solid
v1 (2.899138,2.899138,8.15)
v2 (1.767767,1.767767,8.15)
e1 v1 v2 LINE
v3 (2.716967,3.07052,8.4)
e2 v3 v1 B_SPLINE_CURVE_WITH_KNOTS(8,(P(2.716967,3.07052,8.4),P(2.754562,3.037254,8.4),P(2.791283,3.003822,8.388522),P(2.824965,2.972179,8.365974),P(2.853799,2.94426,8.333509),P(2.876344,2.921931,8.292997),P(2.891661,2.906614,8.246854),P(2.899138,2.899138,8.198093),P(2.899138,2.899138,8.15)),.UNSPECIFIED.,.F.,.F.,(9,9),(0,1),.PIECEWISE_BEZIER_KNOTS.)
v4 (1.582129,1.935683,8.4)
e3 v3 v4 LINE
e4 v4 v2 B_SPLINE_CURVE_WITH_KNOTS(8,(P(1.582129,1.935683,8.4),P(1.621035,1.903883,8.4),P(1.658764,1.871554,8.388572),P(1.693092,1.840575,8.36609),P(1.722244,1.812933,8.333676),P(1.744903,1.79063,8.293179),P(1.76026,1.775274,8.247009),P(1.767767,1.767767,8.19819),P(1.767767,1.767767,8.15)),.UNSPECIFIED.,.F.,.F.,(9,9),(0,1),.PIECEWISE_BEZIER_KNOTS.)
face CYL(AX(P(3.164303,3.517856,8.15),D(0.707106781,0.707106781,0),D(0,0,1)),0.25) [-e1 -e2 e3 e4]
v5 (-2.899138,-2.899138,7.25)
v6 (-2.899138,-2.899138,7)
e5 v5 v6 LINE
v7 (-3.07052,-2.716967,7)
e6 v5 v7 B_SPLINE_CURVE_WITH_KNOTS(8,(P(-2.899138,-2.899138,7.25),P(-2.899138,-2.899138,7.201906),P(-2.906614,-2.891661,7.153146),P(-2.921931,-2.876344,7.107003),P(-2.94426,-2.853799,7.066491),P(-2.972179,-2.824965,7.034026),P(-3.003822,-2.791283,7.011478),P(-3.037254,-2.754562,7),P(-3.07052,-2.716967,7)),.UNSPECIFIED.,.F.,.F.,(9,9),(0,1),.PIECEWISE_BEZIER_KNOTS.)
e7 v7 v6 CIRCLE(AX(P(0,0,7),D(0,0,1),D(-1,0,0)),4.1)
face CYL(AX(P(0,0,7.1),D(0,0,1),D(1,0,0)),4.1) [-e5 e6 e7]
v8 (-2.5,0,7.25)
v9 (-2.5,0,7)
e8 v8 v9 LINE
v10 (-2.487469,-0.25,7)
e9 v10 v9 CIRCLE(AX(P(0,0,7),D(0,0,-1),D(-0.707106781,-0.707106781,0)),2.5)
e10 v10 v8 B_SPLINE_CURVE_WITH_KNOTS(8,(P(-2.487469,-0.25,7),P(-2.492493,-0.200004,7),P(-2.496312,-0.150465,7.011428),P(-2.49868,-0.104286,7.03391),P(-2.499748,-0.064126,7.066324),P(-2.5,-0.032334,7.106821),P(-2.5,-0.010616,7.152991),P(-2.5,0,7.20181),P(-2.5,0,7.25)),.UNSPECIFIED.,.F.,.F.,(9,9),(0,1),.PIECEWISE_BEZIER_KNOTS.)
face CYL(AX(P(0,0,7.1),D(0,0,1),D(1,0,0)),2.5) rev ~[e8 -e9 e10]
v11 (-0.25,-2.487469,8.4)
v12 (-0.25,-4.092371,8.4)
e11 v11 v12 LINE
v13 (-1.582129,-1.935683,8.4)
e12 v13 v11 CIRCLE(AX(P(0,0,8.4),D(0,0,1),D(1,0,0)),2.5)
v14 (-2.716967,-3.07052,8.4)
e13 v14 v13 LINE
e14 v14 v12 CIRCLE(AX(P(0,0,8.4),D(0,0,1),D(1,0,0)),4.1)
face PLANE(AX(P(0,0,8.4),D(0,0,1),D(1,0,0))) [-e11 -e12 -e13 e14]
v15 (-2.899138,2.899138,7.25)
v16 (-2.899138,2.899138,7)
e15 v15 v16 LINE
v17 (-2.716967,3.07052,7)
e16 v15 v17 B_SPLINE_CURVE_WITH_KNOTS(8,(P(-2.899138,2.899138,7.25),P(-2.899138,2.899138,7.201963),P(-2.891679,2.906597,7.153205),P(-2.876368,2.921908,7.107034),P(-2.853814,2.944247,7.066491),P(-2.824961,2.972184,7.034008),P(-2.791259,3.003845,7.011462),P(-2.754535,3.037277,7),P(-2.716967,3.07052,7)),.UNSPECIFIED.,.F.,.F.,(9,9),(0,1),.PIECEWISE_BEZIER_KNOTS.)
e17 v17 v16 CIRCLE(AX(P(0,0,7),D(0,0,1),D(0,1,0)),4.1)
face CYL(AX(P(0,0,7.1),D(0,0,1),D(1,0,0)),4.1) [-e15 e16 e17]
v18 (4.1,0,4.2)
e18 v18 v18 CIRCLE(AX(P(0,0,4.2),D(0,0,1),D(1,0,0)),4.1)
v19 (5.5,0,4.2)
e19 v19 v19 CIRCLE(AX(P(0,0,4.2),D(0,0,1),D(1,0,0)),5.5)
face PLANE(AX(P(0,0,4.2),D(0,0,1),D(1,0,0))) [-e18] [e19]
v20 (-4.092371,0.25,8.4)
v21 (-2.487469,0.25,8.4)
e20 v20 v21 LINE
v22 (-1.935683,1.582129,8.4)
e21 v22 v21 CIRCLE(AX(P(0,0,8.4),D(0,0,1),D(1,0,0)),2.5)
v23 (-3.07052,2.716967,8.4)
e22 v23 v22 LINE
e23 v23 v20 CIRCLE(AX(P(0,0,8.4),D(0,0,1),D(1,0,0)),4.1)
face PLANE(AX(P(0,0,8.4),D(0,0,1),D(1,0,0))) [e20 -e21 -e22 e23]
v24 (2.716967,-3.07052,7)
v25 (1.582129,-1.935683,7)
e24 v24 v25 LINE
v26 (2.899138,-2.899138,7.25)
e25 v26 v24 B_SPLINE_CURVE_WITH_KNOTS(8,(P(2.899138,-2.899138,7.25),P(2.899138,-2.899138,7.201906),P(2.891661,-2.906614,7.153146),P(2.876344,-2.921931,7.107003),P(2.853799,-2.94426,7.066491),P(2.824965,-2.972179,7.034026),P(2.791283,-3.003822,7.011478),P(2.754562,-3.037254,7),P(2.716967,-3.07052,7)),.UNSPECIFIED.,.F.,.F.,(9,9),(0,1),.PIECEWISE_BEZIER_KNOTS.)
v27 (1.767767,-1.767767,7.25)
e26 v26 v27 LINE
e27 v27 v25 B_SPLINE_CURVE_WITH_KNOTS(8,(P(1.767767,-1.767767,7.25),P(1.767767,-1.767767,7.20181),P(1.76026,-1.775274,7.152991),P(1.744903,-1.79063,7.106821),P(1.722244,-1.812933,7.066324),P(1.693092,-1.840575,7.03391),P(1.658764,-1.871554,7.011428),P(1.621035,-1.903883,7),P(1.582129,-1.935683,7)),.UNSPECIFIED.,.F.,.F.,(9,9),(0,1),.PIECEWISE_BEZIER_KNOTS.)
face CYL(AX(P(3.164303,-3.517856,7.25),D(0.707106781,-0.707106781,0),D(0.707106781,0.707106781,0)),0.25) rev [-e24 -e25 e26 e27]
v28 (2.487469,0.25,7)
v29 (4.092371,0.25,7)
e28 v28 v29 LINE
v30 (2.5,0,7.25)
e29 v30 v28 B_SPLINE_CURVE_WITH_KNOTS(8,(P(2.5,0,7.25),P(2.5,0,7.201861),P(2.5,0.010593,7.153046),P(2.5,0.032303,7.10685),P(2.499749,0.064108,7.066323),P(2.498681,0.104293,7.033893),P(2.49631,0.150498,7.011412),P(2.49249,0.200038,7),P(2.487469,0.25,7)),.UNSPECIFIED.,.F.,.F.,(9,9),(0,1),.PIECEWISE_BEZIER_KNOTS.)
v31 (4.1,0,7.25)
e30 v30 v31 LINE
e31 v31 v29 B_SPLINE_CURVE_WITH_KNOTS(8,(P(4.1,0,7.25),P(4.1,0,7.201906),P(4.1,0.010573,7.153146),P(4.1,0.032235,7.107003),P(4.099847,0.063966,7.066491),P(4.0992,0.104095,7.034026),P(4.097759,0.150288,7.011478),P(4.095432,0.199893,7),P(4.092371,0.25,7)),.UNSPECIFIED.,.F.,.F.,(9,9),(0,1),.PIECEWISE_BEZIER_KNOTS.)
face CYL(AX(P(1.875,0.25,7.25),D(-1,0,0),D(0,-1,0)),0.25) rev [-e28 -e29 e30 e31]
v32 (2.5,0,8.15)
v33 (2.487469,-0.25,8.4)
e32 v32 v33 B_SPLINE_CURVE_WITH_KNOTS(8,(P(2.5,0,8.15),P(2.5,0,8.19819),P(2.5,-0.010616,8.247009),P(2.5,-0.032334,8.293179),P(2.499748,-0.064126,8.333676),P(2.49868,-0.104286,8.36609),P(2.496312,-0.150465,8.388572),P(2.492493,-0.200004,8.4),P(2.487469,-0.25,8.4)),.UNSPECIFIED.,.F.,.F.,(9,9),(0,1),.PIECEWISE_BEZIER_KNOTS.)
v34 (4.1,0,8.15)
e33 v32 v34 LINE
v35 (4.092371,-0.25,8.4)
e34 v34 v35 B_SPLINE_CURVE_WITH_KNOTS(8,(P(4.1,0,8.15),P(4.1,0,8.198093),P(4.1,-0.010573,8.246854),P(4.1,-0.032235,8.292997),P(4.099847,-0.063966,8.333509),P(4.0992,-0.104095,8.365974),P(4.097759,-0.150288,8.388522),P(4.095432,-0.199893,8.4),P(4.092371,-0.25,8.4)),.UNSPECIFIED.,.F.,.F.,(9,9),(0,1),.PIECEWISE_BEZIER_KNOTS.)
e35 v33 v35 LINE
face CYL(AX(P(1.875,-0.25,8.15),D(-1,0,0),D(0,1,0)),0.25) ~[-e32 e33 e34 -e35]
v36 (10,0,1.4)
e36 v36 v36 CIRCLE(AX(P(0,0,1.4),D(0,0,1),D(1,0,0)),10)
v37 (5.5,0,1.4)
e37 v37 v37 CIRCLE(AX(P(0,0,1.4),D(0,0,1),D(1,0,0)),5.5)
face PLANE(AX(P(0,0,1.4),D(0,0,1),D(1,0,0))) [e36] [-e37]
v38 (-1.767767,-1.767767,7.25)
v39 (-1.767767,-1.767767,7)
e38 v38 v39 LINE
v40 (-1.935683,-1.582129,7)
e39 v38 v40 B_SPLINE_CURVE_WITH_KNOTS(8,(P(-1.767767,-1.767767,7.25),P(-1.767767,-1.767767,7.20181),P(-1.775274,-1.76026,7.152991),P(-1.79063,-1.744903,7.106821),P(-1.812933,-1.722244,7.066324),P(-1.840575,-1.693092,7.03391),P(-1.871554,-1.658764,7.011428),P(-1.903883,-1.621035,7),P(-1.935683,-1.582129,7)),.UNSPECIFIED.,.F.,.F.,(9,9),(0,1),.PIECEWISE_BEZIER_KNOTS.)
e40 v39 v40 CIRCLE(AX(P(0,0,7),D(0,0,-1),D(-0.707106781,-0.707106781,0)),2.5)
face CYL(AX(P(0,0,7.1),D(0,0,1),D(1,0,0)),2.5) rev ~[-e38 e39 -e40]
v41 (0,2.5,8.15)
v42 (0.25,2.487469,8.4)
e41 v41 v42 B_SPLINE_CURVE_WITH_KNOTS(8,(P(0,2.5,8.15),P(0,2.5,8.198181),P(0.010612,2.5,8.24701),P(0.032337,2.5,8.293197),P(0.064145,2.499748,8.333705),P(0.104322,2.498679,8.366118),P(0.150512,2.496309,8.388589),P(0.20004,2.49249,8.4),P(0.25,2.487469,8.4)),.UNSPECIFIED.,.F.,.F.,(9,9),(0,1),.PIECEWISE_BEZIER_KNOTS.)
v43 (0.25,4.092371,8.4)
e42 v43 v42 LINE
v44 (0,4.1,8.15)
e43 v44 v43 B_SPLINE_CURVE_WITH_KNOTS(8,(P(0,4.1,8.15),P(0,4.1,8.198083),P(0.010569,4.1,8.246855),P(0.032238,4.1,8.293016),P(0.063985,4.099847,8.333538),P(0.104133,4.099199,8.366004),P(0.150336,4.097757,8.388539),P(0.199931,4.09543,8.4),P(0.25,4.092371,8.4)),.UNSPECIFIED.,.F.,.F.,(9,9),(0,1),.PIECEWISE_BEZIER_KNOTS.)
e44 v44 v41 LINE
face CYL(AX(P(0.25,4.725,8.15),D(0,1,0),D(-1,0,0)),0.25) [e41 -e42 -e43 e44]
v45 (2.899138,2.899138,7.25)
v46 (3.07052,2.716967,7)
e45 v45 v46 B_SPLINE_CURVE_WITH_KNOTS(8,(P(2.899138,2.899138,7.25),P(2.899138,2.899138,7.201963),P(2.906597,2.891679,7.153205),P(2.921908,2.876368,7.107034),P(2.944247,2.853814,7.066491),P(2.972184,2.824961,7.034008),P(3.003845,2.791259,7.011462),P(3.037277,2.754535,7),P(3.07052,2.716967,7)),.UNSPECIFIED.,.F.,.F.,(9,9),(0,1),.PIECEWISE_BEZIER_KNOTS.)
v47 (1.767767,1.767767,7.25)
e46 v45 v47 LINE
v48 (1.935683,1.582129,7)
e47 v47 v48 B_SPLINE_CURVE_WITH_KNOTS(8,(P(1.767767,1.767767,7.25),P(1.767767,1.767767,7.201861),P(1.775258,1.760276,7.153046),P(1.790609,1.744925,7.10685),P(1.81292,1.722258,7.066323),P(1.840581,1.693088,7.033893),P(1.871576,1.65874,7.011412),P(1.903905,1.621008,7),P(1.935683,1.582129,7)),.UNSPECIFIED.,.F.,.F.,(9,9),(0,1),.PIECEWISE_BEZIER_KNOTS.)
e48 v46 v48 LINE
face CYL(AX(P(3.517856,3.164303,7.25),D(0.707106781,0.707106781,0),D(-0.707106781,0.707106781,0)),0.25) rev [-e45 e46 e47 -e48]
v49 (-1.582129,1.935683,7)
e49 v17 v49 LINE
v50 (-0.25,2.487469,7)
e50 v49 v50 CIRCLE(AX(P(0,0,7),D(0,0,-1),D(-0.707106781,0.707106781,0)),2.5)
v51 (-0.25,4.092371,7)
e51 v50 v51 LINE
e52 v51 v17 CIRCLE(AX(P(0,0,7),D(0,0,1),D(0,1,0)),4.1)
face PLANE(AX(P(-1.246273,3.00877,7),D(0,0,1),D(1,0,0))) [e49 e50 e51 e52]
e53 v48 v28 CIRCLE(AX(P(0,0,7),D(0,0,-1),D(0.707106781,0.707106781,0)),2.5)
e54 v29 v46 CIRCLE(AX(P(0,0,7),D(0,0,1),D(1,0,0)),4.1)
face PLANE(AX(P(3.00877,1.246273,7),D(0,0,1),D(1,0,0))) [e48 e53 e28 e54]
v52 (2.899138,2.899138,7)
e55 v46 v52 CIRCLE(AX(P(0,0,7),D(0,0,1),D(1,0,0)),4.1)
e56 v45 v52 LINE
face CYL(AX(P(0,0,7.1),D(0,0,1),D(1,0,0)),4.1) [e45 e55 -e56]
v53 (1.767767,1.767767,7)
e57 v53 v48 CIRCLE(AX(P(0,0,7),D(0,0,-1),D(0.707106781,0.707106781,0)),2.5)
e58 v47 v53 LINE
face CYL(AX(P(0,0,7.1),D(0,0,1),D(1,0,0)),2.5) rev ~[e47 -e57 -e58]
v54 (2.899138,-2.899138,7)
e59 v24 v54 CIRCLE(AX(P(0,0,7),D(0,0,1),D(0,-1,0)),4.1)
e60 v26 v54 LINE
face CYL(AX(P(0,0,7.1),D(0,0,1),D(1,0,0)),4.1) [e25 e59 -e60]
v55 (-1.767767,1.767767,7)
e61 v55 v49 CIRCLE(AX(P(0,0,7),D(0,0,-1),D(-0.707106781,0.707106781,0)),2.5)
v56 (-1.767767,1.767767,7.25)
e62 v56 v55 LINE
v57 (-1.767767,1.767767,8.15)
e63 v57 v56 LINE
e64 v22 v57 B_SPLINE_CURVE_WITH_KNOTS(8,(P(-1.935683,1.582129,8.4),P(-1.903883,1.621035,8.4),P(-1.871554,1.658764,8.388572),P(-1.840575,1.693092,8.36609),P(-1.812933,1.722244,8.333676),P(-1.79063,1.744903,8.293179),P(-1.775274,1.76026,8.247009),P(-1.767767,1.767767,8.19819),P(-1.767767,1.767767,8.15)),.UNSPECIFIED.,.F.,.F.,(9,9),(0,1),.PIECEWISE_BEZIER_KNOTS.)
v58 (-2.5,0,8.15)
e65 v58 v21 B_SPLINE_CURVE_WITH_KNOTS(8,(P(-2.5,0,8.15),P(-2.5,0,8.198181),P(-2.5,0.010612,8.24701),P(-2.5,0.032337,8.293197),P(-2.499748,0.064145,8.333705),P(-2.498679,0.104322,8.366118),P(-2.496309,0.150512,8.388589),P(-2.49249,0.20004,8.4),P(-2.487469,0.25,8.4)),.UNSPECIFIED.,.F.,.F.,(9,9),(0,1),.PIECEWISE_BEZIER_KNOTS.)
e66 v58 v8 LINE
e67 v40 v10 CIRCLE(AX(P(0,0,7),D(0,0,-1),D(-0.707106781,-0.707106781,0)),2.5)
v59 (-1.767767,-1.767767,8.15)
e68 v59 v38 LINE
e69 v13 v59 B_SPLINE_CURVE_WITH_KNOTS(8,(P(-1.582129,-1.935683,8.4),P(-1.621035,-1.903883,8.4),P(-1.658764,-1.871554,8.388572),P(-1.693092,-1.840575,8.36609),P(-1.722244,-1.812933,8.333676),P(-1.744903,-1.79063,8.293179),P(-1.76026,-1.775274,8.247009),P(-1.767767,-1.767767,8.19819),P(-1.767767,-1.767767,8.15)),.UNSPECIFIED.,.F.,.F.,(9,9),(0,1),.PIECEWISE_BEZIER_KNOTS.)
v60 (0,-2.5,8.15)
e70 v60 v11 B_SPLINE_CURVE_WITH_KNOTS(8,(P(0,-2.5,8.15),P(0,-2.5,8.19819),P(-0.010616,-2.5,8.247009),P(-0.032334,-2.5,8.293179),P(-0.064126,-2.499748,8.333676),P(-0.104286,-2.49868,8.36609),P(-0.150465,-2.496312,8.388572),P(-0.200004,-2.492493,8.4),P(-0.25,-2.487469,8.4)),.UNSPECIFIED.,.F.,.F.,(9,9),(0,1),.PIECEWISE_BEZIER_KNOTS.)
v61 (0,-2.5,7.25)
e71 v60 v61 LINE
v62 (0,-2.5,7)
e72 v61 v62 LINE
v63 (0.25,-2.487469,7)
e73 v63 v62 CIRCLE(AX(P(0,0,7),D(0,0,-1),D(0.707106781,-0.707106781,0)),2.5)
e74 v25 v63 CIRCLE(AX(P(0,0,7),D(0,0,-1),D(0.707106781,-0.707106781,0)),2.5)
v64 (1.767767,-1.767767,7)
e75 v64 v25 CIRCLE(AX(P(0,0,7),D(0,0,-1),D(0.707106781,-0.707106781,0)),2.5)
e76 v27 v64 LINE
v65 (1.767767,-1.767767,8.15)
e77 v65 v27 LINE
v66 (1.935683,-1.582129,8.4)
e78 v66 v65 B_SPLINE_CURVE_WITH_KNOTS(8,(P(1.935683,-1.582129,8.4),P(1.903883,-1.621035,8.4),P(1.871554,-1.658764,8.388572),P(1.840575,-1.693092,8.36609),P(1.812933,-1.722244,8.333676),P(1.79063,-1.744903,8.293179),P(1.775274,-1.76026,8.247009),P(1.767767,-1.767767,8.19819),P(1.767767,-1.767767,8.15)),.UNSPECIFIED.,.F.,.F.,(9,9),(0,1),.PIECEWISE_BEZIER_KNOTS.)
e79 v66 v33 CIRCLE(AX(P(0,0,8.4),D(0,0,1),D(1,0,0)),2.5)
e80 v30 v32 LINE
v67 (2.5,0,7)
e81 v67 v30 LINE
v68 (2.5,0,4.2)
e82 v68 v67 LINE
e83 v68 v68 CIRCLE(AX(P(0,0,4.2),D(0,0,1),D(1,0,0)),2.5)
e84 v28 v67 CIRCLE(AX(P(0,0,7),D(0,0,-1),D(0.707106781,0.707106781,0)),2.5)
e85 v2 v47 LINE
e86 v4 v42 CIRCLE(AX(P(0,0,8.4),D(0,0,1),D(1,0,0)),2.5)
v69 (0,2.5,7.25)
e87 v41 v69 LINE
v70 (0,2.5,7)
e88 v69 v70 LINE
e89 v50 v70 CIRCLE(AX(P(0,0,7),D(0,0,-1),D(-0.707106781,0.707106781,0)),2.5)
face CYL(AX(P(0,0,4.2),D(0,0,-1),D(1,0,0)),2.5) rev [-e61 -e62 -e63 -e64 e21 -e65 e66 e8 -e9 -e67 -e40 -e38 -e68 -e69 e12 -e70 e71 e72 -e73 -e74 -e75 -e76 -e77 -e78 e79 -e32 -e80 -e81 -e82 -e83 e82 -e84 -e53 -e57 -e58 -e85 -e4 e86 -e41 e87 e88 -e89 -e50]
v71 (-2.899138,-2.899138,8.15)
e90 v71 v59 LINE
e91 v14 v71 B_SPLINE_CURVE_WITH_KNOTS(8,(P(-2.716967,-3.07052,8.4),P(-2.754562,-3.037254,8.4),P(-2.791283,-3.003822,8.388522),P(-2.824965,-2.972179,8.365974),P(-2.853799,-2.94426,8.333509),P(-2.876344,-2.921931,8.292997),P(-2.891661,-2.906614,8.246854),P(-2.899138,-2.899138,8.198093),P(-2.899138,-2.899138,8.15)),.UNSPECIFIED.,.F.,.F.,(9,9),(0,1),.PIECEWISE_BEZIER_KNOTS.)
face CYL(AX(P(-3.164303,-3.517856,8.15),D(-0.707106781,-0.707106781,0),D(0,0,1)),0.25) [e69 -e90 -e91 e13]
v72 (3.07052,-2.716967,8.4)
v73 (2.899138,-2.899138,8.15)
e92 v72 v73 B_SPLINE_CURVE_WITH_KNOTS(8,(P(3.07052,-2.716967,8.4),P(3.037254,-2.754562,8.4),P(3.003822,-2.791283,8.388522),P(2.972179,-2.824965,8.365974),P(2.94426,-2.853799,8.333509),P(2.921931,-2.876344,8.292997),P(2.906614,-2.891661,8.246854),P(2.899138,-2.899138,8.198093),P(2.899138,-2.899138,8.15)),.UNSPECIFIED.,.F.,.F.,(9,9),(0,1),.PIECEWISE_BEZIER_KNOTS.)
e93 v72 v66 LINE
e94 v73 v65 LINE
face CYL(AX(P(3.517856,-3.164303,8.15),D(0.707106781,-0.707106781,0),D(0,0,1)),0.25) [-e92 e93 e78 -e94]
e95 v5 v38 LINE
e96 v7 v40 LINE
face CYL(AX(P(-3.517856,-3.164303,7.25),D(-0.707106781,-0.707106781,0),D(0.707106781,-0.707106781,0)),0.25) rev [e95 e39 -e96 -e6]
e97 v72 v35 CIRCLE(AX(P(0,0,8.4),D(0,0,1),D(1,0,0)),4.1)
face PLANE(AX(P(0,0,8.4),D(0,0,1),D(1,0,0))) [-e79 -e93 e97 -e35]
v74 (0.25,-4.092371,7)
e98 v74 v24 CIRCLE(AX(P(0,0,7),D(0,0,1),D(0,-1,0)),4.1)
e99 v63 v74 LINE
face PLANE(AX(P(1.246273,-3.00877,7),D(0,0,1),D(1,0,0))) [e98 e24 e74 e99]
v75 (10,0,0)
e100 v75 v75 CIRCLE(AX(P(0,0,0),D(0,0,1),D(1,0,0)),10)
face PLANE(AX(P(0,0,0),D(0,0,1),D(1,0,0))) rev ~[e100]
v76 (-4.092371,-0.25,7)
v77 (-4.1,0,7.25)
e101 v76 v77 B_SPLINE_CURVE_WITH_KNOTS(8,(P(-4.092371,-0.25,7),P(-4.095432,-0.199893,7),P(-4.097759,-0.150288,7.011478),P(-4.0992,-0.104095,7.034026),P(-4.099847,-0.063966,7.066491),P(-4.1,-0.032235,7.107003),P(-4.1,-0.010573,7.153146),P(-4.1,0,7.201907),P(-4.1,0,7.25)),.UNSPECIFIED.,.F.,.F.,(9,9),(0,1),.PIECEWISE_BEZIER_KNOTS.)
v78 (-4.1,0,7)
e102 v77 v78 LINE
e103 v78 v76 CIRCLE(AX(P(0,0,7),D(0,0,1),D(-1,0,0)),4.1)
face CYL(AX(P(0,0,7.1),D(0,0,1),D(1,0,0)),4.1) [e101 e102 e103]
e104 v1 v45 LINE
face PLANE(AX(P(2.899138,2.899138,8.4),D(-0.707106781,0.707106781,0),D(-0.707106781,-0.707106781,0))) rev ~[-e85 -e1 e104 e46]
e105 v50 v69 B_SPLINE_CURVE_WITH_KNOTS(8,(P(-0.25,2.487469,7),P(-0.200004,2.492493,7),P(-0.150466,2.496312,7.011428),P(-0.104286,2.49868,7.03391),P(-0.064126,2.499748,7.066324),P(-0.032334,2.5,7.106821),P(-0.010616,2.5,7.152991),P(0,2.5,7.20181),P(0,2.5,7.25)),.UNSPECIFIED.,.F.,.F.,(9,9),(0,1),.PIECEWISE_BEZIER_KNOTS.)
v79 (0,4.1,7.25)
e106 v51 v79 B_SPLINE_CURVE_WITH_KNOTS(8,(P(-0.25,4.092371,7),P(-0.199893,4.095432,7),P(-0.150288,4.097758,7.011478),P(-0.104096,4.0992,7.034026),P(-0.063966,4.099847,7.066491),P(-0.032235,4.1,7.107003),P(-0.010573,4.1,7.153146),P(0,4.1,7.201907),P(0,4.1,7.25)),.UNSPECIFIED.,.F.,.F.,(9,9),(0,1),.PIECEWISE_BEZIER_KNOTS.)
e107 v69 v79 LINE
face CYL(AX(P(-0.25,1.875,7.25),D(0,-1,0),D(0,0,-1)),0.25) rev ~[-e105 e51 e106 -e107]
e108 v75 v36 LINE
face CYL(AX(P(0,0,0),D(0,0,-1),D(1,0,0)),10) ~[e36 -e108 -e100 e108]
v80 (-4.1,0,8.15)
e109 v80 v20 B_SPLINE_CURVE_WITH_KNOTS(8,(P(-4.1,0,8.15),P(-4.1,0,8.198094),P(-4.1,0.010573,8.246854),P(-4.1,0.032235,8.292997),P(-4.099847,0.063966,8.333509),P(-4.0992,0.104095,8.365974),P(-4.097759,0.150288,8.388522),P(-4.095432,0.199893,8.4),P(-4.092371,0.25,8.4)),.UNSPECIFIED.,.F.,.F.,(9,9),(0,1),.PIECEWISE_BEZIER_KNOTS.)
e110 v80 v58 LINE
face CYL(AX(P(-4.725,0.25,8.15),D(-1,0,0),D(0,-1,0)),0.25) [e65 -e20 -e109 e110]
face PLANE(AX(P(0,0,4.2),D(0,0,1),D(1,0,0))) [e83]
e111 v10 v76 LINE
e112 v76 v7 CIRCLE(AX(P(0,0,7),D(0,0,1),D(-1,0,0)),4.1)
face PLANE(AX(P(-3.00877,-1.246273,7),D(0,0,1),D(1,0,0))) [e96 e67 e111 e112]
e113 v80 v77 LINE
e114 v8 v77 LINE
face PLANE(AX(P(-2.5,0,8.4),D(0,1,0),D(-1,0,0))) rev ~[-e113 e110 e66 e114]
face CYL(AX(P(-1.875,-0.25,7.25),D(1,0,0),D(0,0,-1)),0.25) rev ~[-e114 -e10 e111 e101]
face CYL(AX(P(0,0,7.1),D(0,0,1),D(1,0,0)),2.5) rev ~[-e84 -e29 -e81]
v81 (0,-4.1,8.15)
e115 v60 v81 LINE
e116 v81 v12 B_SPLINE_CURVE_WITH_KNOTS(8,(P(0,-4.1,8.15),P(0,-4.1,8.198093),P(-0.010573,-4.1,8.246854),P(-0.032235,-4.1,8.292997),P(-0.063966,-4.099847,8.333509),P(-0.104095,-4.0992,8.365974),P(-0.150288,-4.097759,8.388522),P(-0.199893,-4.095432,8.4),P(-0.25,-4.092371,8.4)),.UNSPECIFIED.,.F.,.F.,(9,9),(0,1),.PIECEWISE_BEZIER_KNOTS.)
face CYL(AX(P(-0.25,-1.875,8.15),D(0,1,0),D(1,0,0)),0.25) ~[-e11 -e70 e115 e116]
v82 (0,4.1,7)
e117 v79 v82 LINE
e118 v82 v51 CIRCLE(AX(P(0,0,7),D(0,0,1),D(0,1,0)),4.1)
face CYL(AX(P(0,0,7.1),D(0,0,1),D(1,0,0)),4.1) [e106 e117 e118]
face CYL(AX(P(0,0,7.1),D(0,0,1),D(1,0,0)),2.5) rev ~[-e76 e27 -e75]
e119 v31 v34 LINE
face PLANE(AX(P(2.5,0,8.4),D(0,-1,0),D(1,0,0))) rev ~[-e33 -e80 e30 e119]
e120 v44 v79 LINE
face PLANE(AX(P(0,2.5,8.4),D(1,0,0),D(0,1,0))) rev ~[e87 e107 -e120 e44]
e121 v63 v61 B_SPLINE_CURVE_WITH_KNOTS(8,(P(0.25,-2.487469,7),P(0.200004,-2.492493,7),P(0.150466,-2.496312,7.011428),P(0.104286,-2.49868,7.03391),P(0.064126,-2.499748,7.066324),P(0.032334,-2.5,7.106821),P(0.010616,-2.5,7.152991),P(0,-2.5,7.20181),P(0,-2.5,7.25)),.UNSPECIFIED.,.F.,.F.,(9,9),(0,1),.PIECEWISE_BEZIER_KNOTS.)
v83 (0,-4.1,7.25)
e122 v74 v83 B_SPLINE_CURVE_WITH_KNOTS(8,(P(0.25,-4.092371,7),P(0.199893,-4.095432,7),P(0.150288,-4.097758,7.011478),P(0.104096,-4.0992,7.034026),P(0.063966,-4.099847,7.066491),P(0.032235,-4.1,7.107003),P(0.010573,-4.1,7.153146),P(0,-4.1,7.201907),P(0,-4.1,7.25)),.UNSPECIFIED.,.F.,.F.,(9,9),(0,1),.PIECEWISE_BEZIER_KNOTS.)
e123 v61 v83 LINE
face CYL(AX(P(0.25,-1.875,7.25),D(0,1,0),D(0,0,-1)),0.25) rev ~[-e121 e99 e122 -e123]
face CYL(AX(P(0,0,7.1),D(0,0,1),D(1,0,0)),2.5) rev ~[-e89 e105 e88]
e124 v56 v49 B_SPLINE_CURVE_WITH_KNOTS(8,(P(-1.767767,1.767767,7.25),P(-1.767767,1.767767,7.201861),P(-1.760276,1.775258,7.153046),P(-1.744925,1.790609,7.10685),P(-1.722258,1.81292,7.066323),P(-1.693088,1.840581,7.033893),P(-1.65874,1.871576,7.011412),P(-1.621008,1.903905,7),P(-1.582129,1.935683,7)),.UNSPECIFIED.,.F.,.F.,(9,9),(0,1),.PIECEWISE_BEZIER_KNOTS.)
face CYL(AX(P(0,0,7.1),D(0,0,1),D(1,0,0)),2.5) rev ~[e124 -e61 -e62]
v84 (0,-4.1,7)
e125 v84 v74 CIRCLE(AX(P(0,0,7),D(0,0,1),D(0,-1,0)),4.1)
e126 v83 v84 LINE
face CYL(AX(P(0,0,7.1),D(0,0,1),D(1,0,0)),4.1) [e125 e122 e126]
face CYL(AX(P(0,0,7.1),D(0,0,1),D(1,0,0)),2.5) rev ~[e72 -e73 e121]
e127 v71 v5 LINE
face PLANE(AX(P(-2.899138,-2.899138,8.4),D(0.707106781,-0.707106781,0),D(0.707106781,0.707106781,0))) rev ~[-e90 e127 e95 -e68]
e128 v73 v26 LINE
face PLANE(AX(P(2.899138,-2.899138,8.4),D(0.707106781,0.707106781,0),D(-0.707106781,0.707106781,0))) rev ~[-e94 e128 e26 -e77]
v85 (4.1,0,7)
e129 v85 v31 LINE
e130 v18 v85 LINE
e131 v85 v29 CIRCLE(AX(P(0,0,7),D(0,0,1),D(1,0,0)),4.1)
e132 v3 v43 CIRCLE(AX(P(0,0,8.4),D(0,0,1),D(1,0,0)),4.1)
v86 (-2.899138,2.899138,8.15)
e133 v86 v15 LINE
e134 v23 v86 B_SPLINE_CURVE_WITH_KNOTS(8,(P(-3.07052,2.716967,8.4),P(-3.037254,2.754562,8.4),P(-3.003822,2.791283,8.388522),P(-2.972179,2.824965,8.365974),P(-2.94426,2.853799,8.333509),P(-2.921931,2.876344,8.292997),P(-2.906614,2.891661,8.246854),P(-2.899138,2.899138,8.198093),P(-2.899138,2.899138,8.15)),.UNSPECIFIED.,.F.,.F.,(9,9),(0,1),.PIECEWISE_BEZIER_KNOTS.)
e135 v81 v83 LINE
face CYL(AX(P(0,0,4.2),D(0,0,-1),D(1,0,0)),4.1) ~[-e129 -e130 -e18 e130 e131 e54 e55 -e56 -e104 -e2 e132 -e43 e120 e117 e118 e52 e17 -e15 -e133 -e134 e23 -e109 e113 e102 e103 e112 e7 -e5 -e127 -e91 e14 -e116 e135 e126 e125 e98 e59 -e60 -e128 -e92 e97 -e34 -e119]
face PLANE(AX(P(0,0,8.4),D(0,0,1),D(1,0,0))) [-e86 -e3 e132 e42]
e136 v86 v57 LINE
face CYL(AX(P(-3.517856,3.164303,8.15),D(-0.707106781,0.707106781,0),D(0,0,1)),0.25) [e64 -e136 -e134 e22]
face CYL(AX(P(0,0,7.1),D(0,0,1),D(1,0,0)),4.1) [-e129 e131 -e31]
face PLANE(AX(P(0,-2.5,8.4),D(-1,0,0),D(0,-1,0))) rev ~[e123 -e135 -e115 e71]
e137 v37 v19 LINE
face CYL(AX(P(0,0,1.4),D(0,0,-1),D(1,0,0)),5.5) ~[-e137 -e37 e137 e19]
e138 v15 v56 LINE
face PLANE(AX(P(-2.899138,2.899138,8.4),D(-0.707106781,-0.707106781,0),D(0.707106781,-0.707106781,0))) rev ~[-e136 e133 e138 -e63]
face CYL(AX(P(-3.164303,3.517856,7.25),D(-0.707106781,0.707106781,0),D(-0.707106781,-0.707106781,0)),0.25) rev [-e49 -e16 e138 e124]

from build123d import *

# Parameters (mm, degrees)
F0_R         = 10
F1_DEPTH     = 1.4
F2_R         = 5.5
F3_DEPTH     = 2.8
F4_R         = 4.1
F4_R_2       = 2.5
F5_DEPTH     = 4.2
F7_DEPTH     = 1.4
F8_T4_DEPTH  = 2.85
F8_S5_R      = 4.1
F8_T6_DEPTH  = 3
F8_S7_R      = 2.5
F8_T8_DEPTH  = 3
F8_T12_DEPTH = 2.85
F8_S13_R     = 4.1
F8_T14_DEPTH = 3
F8_S15_R     = 2.5
F8_T16_DEPTH = 3
F8_T20_DEPTH = 2.85
F8_S21_R     = 4.1
F8_T22_DEPTH = 3
F8_S23_R     = 2.5
F8_T24_DEPTH = 3
F8_T28_DEPTH = 2.85
F8_S29_R     = 4.1
F8_T30_DEPTH = 3
F8_S31_R     = 2.5
F8_T32_DEPTH = 3
F8_T36_DEPTH = 2.85
F8_S37_R     = 4.1
F8_T38_DEPTH = 3
F8_S39_R     = 2.5
F8_T40_DEPTH = 3
F8_T44_DEPTH = 2.85
F8_S45_R     = 4.1
F8_T46_DEPTH = 3
F8_S47_R     = 2.5
F8_T48_DEPTH = 3
F8_T52_DEPTH = 2.85
F8_S53_R     = 4.1
F8_T54_DEPTH = 3
F8_S55_R     = 2.5
F8_T56_DEPTH = 3
F8_T60_DEPTH = 2.85
F8_S61_R     = 4.1
F8_T62_DEPTH = 3
F8_S63_R     = 2.5
F8_T64_DEPTH = 3
F8_T65_DEPTH = 2.85
F8_T67_DEPTH = 2.85
F8_T69_DEPTH = 2.85
F8_T71_DEPTH = 2.85
F8_T73_DEPTH = 2.85
F8_T75_DEPTH = 2.85
F8_T77_DEPTH = 2.85
F8_T79_DEPTH = 2.85


# Not quite as in the source:
# - a fillet or chamfer that OpenCascade refuses, or shapes differently, is made with other operations: its cross-section is extruded or revolved along the edge and cut away or added


with BuildPart() as f1:
    # F0 (on Top) → F1 (new body)
    with BuildSketch(Plane.XY):
        Circle(F0_R)
    extrude(amount=F1_DEPTH)

    # F2 (on face) → F3 (join)
    with BuildSketch(Plane.XY.offset(1.4)):
        Circle(F2_R)
    extrude(amount=F3_DEPTH)

    # F4 (on face) → F5 (join)
    with BuildSketch(Plane.XY.offset(4.2)):
        Circle(F4_R)
        Circle(F4_R_2, mode=Mode.SUBTRACT)
    extrude(amount=F5_DEPTH)

    # F6 (on face) → F7 (cut)
    with BuildSketch(Plane.XY.offset(8.4)):
        with BuildLine():
            Line((0, -2.5), (0, -4.1))
            ThreePointArc((0, -4.1), (1.5690020727, -3.7879060833), (2.8991378029, -2.8991378029))
            Line((2.8991378029, -2.8991378029), (1.767766953, -1.767766953))
            ThreePointArc((1.767766953, -1.767766953), (0.9567085809, -2.3096988313), (0, -2.5))
        make_face()
        with BuildLine():
            ThreePointArc((-4.1, 0), (-3.7879060833, -1.5690020727), (-2.8991378029, -2.8991378029))
            Line((-2.8991378029, -2.8991378029), (-1.767766953, -1.767766953))
            ThreePointArc((-1.767766953, -1.767766953), (-2.3096988313, -0.9567085809), (-2.5, 0))
            Line((-2.5, 0), (-4.1, 0))
        make_face()
        with BuildLine():
            Line((2.5, 0), (4.1, 0))
            ThreePointArc((4.1, 0), (3.7879060833, 1.5690020727), (2.8991378029, 2.8991378029))
            Line((2.8991378029, 2.8991378029), (1.767766953, 1.767766953))
            ThreePointArc((1.767766953, 1.767766953), (2.3096988313, 0.9567085809), (2.5, 0))
        make_face()
        with BuildLine():
            ThreePointArc((-1.767766953, 1.767766953), (-0.9567085809, 2.3096988313), (0, 2.5))
            Line((0, 2.5), (0, 4.1))
            ThreePointArc((0, 4.1), (-1.5690020727, 3.7879060833), (-2.8991378029, 2.8991378029))
            Line((-2.8991378029, 2.8991378029), (-1.767766953, 1.767766953))
        make_face()
    extrude(amount=-F7_DEPTH, mode=Mode.SUBTRACT)

    # F8: fillet of radius 0.25 on 16 edges, made by hand


with BuildPart() as f8_tool2:
    # F8_s3 → F8_t4 (new body)
    with BuildSketch(Plane.YZ.offset(-1.875)):
        with BuildLine():
            ThreePointArc((-0.25, 7), (-0.0732233047, 7.0732233047), (0, 7.25))
            Line((0, 7.25), (0, 7))
            Line((0, 7), (-0.25, 7))
        make_face()
    extrude(amount=-F8_T4_DEPTH)

    # F8_s5 → F8_t6 (intersect, symmetric)
    with BuildSketch(Plane.XY.offset(7.1)):
        Circle(F8_S5_R)
    extrude(amount=F8_T6_DEPTH, both=True, mode=Mode.INTERSECT)

    # F8_s7 → F8_t8 (cut, symmetric)
    with BuildSketch(Plane.XY.offset(7.1)):
        Circle(F8_S7_R)
    extrude(amount=F8_T8_DEPTH, both=True, mode=Mode.SUBTRACT)


with BuildPart() as f1_1:
    add(f1.part)

    # F8_t1: union F8_tool2
    add(f8_tool2.part)


with BuildPart() as f8_tool10:
    # F8_s11 → F8_t12 (new body)
    with BuildSketch(Plane.XZ.offset(-1.875)):
        with BuildLine():
            ThreePointArc((-0.25, 7), (-0.0732233047, 7.0732233047), (0, 7.25))
            Line((0, 7.25), (0, 7))
            Line((0, 7), (-0.25, 7))
        make_face()
    extrude(amount=-F8_T12_DEPTH)

    # F8_s13 → F8_t14 (intersect, symmetric)
    with BuildSketch(Plane.XY.offset(7.1)):
        Circle(F8_S13_R)
    extrude(amount=F8_T14_DEPTH, both=True, mode=Mode.INTERSECT)

    # F8_s15 → F8_t16 (cut, symmetric)
    with BuildSketch(Plane.XY.offset(7.1)):
        Circle(F8_S15_R)
    extrude(amount=F8_T16_DEPTH, both=True, mode=Mode.SUBTRACT)


with BuildPart() as f1_2:
    add(f1_1.part)

    # F8_t9: union F8_tool10
    add(f8_tool10.part)


with BuildPart() as f8_tool18:
    # F8_s19 → F8_t20 (new body)
    with BuildSketch(Plane(origin=(3.3410795411, -3.3410795411, 0), x_dir=(0, 0, 1), z_dir=(-0.7071067812, 0.7071067812, 0))):
        with BuildLine():
            ThreePointArc((7.25, 0), (7.0732233047, -0.0732233047), (7, -0.25))
            Line((7, -0.25), (7, 0))
            Line((7, 0), (7.25, 0))
        make_face()
    extrude(amount=F8_T20_DEPTH)

    # F8_s21 → F8_t22 (intersect, symmetric)
    with BuildSketch(Plane.XY.offset(7.1)):
        Circle(F8_S21_R)
    extrude(amount=F8_T22_DEPTH, both=True, mode=Mode.INTERSECT)

    # F8_s23 → F8_t24 (cut, symmetric)
    with BuildSketch(Plane.XY.offset(7.1)):
        Circle(F8_S23_R)
    extrude(amount=F8_T24_DEPTH, both=True, mode=Mode.SUBTRACT)


with BuildPart() as f1_3:
    add(f1_2.part)

    # F8_t17: union F8_tool18
    add(f8_tool18.part)


with BuildPart() as f8_tool26:
    # F8_s27 → F8_t28 (new body)
    with BuildSketch(Plane.YZ.offset(1.875)):
        with BuildLine():
            ThreePointArc((0, 7.25), (0.0732233047, 7.0732233047), (0.25, 7))
            Line((0.25, 7), (0, 7))
            Line((0, 7), (0, 7.25))
        make_face()
    extrude(amount=F8_T28_DEPTH)

    # F8_s29 → F8_t30 (intersect, symmetric)
    with BuildSketch(Plane.XY.offset(7.1)):
        Circle(F8_S29_R)
    extrude(amount=F8_T30_DEPTH, both=True, mode=Mode.INTERSECT)

    # F8_s31 → F8_t32 (cut, symmetric)
    with BuildSketch(Plane.XY.offset(7.1)):
        Circle(F8_S31_R)
    extrude(amount=F8_T32_DEPTH, both=True, mode=Mode.SUBTRACT)


with BuildPart() as f1_4:
    add(f1_3.part)

    # F8_t25: union F8_tool26
    add(f8_tool26.part)


with BuildPart() as f8_tool34:
    # F8_s35 → F8_t36 (new body)
    with BuildSketch(Plane(origin=(-3.3410795411, -3.3410795411, 0), x_dir=(0, 0, 1), z_dir=(0.7071067812, 0.7071067812, 0))):
        with BuildLine():
            ThreePointArc((7.25, 0), (7.0732233047, -0.0732233047), (7, -0.25))
            Line((7, -0.25), (7, 0))
            Line((7, 0), (7.25, 0))
        make_face()
    extrude(amount=F8_T36_DEPTH)

    # F8_s37 → F8_t38 (intersect, symmetric)
    with BuildSketch(Plane.XY.offset(7.1)):
        Circle(F8_S37_R)
    extrude(amount=F8_T38_DEPTH, both=True, mode=Mode.INTERSECT)

    # F8_s39 → F8_t40 (cut, symmetric)
    with BuildSketch(Plane.XY.offset(7.1)):
        Circle(F8_S39_R)
    extrude(amount=F8_T40_DEPTH, both=True, mode=Mode.SUBTRACT)


with BuildPart() as f1_5:
    add(f1_4.part)

    # F8_t33: union F8_tool34
    add(f8_tool34.part)


with BuildPart() as f8_tool42:
    # F8_s43 → F8_t44 (new body)
    with BuildSketch(Plane(origin=(-3.3410795411, 3.3410795411, 0), x_dir=(0, 0, 1), z_dir=(0.7071067812, -0.7071067812, 0))):
        with BuildLine():
            ThreePointArc((7.25, 0), (7.0732233047, -0.0732233047), (7, -0.25))
            Line((7, -0.25), (7, 0))
            Line((7, 0), (7.25, 0))
        make_face()
    extrude(amount=F8_T44_DEPTH)

    # F8_s45 → F8_t46 (intersect, symmetric)
    with BuildSketch(Plane.XY.offset(7.1)):
        Circle(F8_S45_R)
    extrude(amount=F8_T46_DEPTH, both=True, mode=Mode.INTERSECT)

    # F8_s47 → F8_t48 (cut, symmetric)
    with BuildSketch(Plane.XY.offset(7.1)):
        Circle(F8_S47_R)
    extrude(amount=F8_T48_DEPTH, both=True, mode=Mode.SUBTRACT)


with BuildPart() as f1_6:
    add(f1_5.part)

    # F8_t41: union F8_tool42
    add(f8_tool42.part)


with BuildPart() as f8_tool50:
    # F8_s51 → F8_t52 (new body)
    with BuildSketch(Plane.XZ.offset(1.875)):
        with BuildLine():
            ThreePointArc((0.25, 7), (0.0732233047, 7.0732233047), (0, 7.25))
            Line((0, 7.25), (0, 7))
            Line((0, 7), (0.25, 7))
        make_face()
    extrude(amount=F8_T52_DEPTH)

    # F8_s53 → F8_t54 (intersect, symmetric)
    with BuildSketch(Plane.XY.offset(7.1)):
        Circle(F8_S53_R)
    extrude(amount=F8_T54_DEPTH, both=True, mode=Mode.INTERSECT)

    # F8_s55 → F8_t56 (cut, symmetric)
    with BuildSketch(Plane.XY.offset(7.1)):
        Circle(F8_S55_R)
    extrude(amount=F8_T56_DEPTH, both=True, mode=Mode.SUBTRACT)


with BuildPart() as f1_7:
    add(f1_6.part)

    # F8_t49: union F8_tool50
    add(f8_tool50.part)


with BuildPart() as f8_tool58:
    # F8_s59 → F8_t60 (new body)
    with BuildSketch(Plane(origin=(3.3410795411, 3.3410795411, 0), x_dir=(0, 0, 1), z_dir=(-0.7071067812, -0.7071067812, 0))):
        with BuildLine():
            ThreePointArc((7.25, 0), (7.0732233047, -0.0732233047), (7, -0.25))
            Line((7, -0.25), (7, 0))
            Line((7, 0), (7.25, 0))
        make_face()
    extrude(amount=F8_T60_DEPTH)

    # F8_s61 → F8_t62 (intersect, symmetric)
    with BuildSketch(Plane.XY.offset(7.1)):
        Circle(F8_S61_R)
    extrude(amount=F8_T62_DEPTH, both=True, mode=Mode.INTERSECT)

    # F8_s63 → F8_t64 (cut, symmetric)
    with BuildSketch(Plane.XY.offset(7.1)):
        Circle(F8_S63_R)
    extrude(amount=F8_T64_DEPTH, both=True, mode=Mode.SUBTRACT)


with BuildPart() as f1_8:
    add(f1_7.part)

    # F8_t57: union F8_tool58
    add(f8_tool58.part)

    # F8_s66 → F8_t65 (cut)
    with BuildSketch(Plane.YZ.offset(-4.725)):
        with BuildLine():
            ThreePointArc((0, 8.15), (0.0732233047, 8.3267766953), (0.25, 8.4))
            Line((0.25, 8.4), (0, 8.4))
            Line((0, 8.4), (0, 8.15))
        make_face()
    extrude(amount=F8_T65_DEPTH, mode=Mode.SUBTRACT)

    # F8_s68 → F8_t67 (cut)
    with BuildSketch(Plane(origin=(-3.3410795411, 3.3410795411, 0), x_dir=(0, 0, 1), z_dir=(0.7071067812, -0.7071067812, 0))):
        with BuildLine():
            ThreePointArc((8.4, 0.25), (8.3267766953, 0.0732233047), (8.15, 0))
            Line((8.15, 0), (8.4, 0))
            Line((8.4, 0), (8.4, 0.25))
        make_face()
    extrude(amount=F8_T67_DEPTH, mode=Mode.SUBTRACT)

    # F8_s70 → F8_t69 (cut)
    with BuildSketch(Plane.XZ.offset(1.875)):
        with BuildLine():
            ThreePointArc((0, 8.15), (-0.0732233047, 8.3267766953), (-0.25, 8.4))
            Line((-0.25, 8.4), (0, 8.4))
            Line((0, 8.4), (0, 8.15))
        make_face()
    extrude(amount=F8_T69_DEPTH, mode=Mode.SUBTRACT)

    # F8_s72 → F8_t71 (cut)
    with BuildSketch(Plane(origin=(-3.3410795411, -3.3410795411, 0), x_dir=(0, 0, 1), z_dir=(0.7071067812, 0.7071067812, 0))):
        with BuildLine():
            ThreePointArc((8.4, 0.25), (8.3267766953, 0.0732233047), (8.15, 0))
            Line((8.15, 0), (8.4, 0))
            Line((8.4, 0), (8.4, 0.25))
        make_face()
    extrude(amount=F8_T71_DEPTH, mode=Mode.SUBTRACT)

    # F8_s74 → F8_t73 (cut)
    with BuildSketch(Plane.YZ.offset(1.875)):
        with BuildLine():
            ThreePointArc((0, 8.15), (-0.0732233047, 8.3267766953), (-0.25, 8.4))
            Line((-0.25, 8.4), (0, 8.4))
            Line((0, 8.4), (0, 8.15))
        make_face()
    extrude(amount=F8_T73_DEPTH, mode=Mode.SUBTRACT)

    # F8_s76 → F8_t75 (cut)
    with BuildSketch(Plane(origin=(3.3410795411, -3.3410795411, 0), x_dir=(0, 0, 1), z_dir=(-0.7071067812, 0.7071067812, 0))):
        with BuildLine():
            ThreePointArc((8.4, 0.25), (8.3267766953, 0.0732233047), (8.15, 0))
            Line((8.15, 0), (8.4, 0))
            Line((8.4, 0), (8.4, 0.25))
        make_face()
    extrude(amount=F8_T75_DEPTH, mode=Mode.SUBTRACT)

    # F8_s78 → F8_t77 (cut)
    with BuildSketch(Plane.XZ.offset(-4.725)):
        with BuildLine():
            ThreePointArc((0, 8.15), (0.0732233047, 8.3267766953), (0.25, 8.4))
            Line((0.25, 8.4), (0, 8.4))
            Line((0, 8.4), (0, 8.15))
        make_face()
    extrude(amount=F8_T77_DEPTH, mode=Mode.SUBTRACT)

    # F8_s80 → F8_t79 (cut)
    with BuildSketch(Plane(origin=(3.3410795411, 3.3410795411, 0), x_dir=(0, 0, 1), z_dir=(-0.7071067812, -0.7071067812, 0))):
        with BuildLine():
            ThreePointArc((8.4, 0.25), (8.3267766953, 0.0732233047), (8.15, 0))
            Line((8.15, 0), (8.4, 0))
            Line((8.4, 0), (8.4, 0.25))
        make_face()
    extrude(amount=F8_T79_DEPTH, mode=Mode.SUBTRACT)


solid = f1_8.part
